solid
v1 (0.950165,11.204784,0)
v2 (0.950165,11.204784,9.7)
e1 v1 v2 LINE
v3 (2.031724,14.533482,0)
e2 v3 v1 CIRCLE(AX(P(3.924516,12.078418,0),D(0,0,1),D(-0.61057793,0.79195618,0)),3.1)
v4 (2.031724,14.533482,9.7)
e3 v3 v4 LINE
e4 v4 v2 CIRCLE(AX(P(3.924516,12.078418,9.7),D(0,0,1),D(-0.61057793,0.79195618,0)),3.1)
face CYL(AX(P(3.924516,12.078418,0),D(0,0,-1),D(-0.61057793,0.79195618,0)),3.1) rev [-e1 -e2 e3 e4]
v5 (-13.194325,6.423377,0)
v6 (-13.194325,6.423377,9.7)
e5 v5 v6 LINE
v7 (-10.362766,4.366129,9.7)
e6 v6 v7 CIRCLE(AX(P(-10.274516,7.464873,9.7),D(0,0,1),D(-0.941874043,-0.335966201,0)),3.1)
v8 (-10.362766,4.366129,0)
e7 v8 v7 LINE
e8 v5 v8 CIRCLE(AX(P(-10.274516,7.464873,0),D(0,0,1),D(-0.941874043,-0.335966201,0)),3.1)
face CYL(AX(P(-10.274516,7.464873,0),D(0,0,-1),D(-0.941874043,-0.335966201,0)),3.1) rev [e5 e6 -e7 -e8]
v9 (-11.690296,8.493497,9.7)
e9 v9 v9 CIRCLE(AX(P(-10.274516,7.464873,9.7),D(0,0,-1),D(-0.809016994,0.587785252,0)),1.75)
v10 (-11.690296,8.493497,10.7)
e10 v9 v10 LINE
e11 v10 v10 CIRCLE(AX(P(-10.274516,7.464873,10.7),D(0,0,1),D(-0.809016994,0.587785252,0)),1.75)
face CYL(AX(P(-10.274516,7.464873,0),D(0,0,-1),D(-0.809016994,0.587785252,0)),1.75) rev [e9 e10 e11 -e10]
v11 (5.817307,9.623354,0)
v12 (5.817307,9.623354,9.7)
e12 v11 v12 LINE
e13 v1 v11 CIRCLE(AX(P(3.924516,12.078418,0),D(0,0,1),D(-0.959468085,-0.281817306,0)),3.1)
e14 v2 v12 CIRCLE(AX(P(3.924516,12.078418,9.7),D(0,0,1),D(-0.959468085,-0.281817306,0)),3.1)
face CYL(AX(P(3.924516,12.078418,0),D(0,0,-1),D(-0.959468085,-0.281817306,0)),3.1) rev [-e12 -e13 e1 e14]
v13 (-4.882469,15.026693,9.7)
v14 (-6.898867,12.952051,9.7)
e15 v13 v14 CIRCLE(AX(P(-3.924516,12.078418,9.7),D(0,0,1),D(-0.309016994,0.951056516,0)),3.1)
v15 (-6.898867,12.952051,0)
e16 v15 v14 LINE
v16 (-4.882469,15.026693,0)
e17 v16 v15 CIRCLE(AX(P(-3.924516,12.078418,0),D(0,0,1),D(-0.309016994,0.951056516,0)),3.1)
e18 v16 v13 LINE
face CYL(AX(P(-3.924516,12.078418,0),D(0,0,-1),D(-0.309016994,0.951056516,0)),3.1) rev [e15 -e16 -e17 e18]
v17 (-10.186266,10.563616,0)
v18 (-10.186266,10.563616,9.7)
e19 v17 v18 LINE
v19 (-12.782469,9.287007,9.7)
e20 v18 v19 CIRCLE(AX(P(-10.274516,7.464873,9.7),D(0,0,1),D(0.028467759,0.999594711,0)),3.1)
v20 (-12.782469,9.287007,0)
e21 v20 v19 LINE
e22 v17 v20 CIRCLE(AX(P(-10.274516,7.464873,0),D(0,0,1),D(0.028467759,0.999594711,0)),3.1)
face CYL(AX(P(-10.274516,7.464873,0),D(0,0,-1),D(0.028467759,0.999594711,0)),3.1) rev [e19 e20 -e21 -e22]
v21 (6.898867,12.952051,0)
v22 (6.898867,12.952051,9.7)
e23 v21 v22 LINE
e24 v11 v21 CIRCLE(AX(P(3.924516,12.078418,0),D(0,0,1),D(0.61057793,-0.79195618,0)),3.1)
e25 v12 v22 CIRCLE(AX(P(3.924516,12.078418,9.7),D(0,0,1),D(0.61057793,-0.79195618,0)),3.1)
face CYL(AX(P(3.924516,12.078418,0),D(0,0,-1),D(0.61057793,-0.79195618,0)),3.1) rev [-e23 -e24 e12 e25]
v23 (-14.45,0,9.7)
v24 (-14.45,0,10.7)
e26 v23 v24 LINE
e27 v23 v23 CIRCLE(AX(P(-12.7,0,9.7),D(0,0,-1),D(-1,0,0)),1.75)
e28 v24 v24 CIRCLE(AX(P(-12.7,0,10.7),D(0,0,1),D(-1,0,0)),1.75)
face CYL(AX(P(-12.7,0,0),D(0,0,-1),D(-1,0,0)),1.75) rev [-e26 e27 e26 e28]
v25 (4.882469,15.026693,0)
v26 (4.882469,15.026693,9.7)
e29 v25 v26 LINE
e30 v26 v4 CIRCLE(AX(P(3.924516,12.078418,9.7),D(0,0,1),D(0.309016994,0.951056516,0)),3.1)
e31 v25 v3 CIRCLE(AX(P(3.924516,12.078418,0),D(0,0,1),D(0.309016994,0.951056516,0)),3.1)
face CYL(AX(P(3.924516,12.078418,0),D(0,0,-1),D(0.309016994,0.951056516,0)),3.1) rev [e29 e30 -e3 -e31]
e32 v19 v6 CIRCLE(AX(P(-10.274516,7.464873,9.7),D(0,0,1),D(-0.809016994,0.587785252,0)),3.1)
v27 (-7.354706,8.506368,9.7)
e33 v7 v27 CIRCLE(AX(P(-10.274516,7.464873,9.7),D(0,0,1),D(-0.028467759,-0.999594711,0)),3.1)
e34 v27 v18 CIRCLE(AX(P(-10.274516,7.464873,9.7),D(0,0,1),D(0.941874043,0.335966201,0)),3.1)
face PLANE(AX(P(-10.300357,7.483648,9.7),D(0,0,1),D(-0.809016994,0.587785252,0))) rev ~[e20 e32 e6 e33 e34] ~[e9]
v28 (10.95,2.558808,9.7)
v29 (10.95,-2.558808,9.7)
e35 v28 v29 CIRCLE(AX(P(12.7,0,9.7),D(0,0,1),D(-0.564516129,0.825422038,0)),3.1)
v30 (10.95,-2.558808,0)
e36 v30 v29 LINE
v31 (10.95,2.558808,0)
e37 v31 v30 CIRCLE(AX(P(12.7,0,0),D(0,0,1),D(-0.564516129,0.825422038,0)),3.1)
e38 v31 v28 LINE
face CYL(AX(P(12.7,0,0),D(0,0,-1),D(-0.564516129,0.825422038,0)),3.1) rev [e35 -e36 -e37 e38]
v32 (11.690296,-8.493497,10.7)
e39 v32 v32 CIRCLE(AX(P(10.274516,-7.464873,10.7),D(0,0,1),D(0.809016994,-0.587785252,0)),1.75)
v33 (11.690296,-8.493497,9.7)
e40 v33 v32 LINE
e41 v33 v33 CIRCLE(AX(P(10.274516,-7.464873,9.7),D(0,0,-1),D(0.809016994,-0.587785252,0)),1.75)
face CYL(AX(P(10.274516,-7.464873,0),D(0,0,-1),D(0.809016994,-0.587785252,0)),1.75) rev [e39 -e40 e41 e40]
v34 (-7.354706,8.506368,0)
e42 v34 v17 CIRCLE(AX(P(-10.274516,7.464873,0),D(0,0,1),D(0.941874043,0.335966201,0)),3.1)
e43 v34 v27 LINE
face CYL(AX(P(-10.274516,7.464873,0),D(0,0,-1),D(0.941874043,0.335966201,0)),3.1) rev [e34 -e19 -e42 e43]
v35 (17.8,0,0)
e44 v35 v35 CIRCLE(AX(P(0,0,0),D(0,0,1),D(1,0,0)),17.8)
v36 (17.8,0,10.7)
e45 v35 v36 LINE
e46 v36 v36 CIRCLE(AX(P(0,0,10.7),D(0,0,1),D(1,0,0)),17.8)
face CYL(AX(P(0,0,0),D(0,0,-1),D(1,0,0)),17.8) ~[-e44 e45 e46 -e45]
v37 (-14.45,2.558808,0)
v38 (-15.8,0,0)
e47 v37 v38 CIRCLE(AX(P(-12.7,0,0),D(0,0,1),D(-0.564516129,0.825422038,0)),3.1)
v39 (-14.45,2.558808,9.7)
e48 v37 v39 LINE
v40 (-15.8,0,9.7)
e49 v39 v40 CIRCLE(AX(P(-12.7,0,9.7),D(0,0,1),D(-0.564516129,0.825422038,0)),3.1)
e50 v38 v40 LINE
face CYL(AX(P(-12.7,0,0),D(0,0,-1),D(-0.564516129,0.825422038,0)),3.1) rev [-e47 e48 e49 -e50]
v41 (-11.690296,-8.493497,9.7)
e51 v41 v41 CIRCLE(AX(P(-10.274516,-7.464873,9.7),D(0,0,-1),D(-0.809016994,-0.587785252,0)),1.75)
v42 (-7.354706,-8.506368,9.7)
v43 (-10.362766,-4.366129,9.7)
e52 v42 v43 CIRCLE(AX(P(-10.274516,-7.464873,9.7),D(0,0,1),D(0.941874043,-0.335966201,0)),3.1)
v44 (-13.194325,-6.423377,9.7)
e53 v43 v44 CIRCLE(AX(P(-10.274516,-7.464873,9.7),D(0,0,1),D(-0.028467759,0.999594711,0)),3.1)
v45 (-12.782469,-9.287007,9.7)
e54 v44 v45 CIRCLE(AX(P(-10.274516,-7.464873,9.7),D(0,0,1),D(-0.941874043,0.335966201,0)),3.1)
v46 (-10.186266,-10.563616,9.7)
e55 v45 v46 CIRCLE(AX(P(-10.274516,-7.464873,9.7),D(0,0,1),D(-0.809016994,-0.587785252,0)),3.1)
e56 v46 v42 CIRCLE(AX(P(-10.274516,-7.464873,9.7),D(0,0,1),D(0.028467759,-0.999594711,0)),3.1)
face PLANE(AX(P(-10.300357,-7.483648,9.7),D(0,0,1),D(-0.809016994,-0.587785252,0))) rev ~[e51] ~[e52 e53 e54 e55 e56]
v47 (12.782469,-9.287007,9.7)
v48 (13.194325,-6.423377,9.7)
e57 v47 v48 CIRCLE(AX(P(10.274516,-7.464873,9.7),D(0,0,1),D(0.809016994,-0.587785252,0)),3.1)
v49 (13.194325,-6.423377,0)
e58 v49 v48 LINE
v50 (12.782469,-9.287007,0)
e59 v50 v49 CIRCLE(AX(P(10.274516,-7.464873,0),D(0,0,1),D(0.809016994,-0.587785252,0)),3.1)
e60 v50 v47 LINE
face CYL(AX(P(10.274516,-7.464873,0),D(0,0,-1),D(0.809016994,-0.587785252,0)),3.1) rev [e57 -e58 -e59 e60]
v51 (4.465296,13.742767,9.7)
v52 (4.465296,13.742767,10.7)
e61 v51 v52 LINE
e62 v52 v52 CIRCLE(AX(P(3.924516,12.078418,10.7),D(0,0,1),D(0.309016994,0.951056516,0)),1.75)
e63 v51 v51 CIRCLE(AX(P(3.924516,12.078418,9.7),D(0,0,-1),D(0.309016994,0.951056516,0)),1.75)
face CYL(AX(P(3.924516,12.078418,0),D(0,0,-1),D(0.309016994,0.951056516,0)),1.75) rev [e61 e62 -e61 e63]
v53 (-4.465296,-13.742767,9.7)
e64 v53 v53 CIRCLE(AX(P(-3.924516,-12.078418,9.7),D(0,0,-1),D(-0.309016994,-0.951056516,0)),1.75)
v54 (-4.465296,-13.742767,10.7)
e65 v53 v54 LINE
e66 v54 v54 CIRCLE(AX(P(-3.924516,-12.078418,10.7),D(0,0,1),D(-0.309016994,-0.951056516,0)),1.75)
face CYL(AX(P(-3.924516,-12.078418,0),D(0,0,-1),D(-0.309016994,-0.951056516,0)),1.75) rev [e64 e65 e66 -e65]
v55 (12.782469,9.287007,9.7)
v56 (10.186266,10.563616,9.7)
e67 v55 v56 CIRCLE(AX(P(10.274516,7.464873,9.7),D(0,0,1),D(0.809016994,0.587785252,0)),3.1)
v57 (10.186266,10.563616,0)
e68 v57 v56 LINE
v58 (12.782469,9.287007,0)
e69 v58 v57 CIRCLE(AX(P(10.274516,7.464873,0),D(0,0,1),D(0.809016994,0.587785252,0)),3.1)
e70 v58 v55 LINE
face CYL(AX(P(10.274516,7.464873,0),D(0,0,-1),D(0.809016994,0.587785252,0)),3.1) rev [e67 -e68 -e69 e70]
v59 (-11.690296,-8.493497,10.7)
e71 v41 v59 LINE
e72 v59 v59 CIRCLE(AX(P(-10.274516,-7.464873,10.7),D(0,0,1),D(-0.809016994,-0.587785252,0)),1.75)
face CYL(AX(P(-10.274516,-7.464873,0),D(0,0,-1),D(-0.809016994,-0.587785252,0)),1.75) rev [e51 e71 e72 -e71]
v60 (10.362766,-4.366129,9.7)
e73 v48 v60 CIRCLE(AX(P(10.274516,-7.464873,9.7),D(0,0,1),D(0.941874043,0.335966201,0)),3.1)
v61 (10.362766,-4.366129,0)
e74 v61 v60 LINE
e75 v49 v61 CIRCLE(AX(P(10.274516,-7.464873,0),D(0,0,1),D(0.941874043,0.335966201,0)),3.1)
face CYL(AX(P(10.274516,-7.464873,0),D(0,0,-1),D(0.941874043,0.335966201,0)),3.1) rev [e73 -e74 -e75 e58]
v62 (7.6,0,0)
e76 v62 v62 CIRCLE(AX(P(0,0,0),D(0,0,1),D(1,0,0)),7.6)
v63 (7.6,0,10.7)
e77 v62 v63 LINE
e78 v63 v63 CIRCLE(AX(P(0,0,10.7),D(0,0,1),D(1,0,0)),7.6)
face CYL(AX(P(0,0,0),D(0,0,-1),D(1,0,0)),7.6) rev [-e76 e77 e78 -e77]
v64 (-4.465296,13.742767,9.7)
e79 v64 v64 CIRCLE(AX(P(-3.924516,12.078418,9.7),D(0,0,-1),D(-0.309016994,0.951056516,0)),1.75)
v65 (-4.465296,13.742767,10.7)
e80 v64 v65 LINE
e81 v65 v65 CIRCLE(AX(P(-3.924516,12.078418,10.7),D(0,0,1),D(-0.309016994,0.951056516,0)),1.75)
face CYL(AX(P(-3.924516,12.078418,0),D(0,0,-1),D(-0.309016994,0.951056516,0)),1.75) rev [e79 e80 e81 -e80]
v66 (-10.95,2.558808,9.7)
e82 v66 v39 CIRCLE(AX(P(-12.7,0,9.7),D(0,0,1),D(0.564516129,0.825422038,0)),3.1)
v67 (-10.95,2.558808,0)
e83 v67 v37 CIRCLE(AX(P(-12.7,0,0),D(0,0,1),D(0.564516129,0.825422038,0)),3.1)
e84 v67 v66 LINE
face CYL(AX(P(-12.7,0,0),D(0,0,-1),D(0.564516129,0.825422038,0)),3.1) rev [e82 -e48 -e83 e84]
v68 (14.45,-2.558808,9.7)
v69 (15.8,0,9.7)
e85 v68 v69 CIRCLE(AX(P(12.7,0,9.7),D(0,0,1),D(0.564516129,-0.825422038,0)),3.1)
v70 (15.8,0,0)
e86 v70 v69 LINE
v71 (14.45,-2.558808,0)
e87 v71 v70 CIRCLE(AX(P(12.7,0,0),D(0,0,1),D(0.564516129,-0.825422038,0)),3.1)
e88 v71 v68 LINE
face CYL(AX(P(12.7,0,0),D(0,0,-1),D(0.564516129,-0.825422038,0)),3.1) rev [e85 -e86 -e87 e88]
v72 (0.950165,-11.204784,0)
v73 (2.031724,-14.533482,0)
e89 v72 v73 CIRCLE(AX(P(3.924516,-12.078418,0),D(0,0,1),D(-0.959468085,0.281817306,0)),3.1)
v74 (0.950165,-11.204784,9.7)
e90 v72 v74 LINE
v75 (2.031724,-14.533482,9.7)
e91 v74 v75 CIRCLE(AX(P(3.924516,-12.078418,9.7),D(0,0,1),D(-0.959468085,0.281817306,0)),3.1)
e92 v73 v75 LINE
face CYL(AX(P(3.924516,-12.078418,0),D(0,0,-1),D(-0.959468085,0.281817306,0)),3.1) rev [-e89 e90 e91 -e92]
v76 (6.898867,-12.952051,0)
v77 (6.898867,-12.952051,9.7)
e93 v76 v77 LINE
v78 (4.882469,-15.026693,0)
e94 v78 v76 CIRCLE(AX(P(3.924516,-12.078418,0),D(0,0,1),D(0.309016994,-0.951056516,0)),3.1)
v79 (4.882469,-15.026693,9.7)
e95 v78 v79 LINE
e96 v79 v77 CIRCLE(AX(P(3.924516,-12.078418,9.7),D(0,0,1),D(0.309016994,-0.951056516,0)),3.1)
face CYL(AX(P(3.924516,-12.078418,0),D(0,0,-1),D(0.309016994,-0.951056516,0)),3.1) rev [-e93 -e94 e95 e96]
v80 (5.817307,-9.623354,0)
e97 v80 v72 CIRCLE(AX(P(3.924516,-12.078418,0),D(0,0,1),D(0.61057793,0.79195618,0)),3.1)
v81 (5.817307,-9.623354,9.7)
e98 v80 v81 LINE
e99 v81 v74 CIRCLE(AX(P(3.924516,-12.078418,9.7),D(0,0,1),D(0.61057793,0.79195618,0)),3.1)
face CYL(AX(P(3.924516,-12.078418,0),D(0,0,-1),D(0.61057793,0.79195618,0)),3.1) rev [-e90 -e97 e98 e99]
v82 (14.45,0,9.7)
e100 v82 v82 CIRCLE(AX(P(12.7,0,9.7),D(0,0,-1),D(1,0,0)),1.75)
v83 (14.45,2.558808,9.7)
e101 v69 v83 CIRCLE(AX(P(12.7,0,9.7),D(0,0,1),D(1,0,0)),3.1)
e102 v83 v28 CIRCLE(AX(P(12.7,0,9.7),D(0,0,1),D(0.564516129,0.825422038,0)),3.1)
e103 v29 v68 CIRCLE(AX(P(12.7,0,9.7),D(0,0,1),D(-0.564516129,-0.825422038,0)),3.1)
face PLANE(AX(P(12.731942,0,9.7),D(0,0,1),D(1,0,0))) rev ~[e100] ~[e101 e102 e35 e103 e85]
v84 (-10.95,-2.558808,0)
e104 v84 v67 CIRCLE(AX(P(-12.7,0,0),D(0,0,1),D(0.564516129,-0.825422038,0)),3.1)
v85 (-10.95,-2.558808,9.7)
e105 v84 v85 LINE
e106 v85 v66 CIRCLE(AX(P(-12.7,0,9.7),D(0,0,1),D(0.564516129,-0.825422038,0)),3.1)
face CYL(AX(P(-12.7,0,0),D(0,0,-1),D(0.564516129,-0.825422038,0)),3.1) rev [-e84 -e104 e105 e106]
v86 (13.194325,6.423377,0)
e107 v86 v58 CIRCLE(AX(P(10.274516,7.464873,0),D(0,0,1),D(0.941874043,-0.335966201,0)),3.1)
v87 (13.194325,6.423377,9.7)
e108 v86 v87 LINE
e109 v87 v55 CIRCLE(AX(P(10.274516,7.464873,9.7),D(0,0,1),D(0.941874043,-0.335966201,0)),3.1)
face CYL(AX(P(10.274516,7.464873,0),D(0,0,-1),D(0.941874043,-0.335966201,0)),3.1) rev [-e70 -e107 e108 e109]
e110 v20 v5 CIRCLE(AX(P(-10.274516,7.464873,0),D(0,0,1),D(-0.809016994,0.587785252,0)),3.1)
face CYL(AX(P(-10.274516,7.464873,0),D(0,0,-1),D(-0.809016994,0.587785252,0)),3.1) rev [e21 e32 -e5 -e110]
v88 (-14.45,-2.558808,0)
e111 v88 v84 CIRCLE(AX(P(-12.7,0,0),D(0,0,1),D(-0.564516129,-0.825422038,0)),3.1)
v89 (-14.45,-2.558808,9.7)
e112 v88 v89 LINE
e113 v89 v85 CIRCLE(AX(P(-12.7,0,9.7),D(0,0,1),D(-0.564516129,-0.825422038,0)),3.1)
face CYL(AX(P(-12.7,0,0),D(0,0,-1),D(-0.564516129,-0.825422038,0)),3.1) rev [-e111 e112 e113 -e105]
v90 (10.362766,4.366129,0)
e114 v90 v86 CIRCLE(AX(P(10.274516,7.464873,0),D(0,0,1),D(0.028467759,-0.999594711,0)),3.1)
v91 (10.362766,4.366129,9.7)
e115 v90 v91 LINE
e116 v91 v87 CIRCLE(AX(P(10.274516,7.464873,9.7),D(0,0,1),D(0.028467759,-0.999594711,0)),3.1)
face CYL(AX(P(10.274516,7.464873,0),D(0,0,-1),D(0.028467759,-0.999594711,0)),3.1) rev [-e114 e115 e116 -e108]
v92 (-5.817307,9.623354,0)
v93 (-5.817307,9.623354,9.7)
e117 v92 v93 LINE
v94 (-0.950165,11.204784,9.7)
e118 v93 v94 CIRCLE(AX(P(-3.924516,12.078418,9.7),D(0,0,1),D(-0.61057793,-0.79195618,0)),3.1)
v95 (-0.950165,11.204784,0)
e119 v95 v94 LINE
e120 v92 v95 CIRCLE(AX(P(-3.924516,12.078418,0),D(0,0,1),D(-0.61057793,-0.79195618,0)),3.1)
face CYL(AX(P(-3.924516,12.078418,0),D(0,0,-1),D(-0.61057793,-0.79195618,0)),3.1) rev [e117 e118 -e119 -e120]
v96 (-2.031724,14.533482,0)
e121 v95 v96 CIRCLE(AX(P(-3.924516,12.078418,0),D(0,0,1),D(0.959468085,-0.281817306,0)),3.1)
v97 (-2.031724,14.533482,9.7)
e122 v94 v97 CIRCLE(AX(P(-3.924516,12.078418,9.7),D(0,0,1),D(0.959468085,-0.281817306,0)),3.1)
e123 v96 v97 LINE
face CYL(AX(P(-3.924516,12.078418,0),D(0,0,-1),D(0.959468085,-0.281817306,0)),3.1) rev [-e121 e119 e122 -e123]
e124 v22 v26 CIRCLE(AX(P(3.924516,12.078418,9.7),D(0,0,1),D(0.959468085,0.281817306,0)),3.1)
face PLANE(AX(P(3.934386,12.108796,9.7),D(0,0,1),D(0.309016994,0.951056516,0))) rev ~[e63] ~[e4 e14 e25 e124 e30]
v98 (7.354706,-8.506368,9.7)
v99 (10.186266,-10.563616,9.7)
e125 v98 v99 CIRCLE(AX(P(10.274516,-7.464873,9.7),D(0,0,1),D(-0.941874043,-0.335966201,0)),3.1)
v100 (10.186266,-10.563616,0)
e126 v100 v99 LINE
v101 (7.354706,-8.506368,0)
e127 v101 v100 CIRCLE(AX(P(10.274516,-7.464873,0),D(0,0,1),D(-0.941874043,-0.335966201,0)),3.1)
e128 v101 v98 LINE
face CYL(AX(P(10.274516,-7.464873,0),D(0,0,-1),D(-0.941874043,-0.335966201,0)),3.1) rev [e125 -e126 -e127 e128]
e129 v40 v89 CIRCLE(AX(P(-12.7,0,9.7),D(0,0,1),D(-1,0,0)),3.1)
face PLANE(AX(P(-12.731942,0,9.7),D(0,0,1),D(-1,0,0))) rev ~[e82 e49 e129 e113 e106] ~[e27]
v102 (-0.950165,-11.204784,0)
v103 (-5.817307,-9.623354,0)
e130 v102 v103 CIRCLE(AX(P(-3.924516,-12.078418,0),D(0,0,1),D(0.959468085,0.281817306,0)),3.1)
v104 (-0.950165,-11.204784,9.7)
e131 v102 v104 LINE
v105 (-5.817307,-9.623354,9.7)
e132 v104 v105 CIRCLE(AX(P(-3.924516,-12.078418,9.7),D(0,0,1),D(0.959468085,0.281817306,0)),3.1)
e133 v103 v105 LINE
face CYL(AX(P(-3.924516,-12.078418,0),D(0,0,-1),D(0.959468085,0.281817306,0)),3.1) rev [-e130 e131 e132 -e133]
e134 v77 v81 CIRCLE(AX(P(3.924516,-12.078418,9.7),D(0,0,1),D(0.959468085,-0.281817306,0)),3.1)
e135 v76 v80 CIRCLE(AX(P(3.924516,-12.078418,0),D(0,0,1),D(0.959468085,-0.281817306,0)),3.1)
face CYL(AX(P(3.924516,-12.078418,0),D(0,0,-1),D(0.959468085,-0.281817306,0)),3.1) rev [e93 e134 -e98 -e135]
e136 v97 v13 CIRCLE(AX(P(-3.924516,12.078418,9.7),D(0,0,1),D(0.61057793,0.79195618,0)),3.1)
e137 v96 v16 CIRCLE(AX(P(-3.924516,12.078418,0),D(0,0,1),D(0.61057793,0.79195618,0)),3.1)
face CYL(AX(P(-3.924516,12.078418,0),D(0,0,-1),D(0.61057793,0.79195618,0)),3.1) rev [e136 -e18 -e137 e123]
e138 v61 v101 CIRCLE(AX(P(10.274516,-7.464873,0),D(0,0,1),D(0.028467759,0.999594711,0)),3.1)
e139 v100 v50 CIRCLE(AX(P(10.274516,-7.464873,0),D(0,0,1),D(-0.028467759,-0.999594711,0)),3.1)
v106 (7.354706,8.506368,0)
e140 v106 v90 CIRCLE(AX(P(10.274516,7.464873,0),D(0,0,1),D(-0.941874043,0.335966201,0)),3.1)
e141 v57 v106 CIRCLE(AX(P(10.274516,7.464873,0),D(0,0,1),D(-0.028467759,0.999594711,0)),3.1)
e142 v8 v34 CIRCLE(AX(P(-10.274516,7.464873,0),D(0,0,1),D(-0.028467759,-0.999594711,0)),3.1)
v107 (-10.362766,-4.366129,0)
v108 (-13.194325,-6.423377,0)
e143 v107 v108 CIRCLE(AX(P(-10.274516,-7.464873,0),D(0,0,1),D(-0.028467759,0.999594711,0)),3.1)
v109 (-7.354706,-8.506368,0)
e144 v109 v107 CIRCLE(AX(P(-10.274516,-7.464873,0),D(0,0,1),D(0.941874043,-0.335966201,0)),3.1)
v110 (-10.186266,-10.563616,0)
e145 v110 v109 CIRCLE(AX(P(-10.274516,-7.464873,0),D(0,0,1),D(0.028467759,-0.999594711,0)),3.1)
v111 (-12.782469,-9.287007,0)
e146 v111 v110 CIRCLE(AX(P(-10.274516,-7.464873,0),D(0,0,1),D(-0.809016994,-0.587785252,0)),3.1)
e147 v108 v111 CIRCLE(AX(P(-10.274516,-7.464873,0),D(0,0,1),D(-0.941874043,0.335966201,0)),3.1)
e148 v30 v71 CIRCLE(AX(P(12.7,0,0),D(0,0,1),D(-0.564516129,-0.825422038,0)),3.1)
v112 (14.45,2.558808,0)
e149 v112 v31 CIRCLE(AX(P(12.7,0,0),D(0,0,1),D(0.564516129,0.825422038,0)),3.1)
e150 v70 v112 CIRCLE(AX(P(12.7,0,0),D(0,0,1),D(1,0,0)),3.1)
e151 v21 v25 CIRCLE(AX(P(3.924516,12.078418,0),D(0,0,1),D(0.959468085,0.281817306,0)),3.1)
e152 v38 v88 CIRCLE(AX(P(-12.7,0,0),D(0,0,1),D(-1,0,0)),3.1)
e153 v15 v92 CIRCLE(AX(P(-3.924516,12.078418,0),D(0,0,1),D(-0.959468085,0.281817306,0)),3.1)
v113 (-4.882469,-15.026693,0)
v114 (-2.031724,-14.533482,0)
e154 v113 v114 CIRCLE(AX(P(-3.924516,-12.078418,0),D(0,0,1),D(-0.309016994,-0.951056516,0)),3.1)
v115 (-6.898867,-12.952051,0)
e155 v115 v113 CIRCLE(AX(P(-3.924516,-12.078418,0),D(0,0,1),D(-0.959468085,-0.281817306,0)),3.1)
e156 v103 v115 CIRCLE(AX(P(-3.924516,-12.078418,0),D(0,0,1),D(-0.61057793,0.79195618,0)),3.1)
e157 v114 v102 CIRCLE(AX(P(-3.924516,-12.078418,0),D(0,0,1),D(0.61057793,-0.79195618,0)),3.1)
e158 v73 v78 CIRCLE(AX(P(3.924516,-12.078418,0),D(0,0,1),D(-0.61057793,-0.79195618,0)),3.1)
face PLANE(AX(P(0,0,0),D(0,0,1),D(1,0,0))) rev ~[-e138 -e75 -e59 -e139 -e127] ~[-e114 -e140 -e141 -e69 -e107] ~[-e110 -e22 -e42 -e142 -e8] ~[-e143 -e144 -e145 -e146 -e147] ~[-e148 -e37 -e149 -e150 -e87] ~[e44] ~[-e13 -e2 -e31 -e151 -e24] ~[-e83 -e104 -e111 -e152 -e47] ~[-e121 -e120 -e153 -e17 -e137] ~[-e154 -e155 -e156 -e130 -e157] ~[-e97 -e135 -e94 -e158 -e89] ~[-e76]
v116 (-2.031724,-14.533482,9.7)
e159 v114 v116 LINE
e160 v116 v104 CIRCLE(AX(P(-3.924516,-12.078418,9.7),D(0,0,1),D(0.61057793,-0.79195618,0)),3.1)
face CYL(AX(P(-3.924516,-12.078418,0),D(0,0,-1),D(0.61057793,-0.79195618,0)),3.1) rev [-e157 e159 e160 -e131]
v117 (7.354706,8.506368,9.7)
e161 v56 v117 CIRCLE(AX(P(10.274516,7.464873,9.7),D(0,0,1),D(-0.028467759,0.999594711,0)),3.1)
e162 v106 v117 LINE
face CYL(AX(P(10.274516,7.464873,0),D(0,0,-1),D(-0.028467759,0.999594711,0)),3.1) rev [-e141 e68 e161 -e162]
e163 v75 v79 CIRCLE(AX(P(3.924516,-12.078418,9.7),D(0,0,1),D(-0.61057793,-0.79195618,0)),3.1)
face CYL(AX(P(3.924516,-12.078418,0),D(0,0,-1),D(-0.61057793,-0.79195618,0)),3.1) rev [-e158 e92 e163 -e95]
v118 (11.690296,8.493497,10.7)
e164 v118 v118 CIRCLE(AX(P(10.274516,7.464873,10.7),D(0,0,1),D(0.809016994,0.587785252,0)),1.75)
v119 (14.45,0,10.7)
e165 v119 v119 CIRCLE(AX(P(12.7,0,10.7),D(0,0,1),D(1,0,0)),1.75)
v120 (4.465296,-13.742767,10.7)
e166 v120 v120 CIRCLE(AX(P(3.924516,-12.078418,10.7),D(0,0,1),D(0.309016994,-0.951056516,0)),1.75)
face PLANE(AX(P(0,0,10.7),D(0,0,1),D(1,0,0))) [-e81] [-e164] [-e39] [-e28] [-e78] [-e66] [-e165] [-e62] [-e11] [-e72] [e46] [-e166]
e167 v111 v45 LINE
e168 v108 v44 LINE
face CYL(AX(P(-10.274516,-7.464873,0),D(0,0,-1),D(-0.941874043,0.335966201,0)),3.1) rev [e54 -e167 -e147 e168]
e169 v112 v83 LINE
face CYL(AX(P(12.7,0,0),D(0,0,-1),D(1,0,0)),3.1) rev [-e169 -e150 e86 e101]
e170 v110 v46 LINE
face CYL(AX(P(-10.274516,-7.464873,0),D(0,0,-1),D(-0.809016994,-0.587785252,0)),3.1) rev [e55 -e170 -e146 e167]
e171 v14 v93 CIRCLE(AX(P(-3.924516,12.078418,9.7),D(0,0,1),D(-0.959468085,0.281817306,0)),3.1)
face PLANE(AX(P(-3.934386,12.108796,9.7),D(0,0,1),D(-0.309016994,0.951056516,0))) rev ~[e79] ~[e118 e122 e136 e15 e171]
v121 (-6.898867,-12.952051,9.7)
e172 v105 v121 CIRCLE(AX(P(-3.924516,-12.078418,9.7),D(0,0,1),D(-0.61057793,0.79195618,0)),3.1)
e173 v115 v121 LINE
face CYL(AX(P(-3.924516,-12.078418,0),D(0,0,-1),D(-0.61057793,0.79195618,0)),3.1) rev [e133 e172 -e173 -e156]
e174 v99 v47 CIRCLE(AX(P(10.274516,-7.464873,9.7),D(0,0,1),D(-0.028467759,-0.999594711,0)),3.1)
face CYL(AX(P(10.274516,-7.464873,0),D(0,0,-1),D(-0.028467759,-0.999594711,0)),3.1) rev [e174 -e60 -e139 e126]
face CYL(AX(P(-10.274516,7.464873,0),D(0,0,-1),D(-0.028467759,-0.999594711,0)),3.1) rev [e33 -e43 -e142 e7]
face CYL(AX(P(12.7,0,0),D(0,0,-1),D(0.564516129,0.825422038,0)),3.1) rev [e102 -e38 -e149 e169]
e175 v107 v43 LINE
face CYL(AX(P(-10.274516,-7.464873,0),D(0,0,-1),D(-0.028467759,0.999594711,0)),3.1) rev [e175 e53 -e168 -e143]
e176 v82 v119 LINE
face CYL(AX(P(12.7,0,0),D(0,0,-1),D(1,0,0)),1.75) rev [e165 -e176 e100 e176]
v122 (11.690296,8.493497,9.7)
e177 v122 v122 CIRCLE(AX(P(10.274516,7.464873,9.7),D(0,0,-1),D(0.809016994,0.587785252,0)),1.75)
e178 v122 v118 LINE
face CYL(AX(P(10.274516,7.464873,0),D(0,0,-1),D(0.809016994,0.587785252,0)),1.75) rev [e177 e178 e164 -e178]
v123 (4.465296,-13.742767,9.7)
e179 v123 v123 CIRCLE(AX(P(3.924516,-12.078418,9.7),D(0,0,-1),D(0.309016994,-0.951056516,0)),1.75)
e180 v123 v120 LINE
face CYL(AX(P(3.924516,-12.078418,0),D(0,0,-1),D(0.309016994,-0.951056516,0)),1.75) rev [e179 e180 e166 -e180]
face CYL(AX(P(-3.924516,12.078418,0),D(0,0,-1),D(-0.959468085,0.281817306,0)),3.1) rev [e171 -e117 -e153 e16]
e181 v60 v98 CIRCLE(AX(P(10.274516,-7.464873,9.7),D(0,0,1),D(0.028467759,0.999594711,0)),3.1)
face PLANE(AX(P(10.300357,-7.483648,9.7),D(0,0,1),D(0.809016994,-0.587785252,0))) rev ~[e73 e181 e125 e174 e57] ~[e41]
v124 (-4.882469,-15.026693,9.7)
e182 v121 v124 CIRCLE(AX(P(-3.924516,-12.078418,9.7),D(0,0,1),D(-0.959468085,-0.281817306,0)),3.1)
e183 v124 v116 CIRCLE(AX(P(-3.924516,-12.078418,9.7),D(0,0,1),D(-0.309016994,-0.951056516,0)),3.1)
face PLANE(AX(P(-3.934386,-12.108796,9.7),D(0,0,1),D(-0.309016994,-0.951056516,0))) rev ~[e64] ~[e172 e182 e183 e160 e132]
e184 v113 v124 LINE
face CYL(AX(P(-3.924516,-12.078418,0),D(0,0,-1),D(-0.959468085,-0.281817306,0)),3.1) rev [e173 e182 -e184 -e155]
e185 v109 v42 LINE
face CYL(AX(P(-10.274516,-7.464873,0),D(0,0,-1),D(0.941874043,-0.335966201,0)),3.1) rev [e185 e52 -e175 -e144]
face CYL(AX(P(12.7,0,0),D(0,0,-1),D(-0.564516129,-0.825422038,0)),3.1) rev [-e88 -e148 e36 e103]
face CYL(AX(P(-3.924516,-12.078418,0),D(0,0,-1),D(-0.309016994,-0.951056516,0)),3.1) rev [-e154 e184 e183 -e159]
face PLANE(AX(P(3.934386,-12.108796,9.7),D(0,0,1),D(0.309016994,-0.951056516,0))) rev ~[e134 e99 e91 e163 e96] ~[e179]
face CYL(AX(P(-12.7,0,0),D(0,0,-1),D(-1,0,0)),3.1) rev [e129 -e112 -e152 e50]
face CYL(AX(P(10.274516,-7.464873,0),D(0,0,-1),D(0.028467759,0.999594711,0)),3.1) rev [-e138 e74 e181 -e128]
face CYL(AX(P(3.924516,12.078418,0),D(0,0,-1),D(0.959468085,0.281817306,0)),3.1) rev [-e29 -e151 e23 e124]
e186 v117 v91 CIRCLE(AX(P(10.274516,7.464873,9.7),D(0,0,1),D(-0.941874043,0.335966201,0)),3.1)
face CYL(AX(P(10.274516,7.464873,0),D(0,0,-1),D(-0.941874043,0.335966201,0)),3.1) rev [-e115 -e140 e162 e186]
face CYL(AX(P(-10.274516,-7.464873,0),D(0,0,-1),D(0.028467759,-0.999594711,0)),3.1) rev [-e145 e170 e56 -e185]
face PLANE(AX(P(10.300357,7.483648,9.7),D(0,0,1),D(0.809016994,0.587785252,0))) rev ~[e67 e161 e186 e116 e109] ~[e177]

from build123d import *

# Parameters (mm, degrees)
F0_R            = 17.8
F0_R_2          = 7.6
F0_R_3          = 1.75
F1_DEPTH        = 10.7
F2_DEPTH        = 9.7
F2_COPIES_COUNT = 10
F3_DEPTH        = 10.7
F3_COPIES_COUNT = 10


# Not quite as in the source:
# - a pattern or mirror of a feature is missing from the dataset's text; its kind, count and spacing are read off the source's solid


with BuildPart() as f1:
    # F0 (on Top) → F1 (new body)
    with BuildSketch(Plane.XY):
        Circle(F0_R)
        Circle(F0_R_2, mode=Mode.SUBTRACT)
        with BuildLine():
            ThreePointArc((14.45, 2.5588083164), (15.4418059742, 1.4465476141), (15.8, 0))
            ThreePointArc((15.8, 0), (15.4418059742, -1.4465476141), (14.45, -2.5588083164))
            Line((14.45, -2.5588083164), (14.45, -3.5))
            Line((14.45, -3.5), (10.95, -3.5))
            Line((10.95, -3.5), (10.95, -2.5588083164))
            ThreePointArc((10.95, -2.5588083164), (9.6, 0), (10.95, 2.5588083164))
            Line((10.95, 2.5588083164), (10.95, 3.5))
            Line((10.95, 3.5), (14.45, 3.5))
            Line((14.45, 3.5), (14.45, 2.5588083164))
        make_face(mode=Mode.SUBTRACT)
        with BuildLine():
            ThreePointArc((14.45, -2.5588083164), (15.4418059742, -1.4465476141), (15.8, 0))
            ThreePointArc((15.8, 0), (15.4418059742, 1.4465476141), (14.45, 2.5588083164))
            ThreePointArc((14.45, 2.5588083164), (12.7, 3.1), (10.95, 2.5588083164))
            ThreePointArc((10.95, 2.5588083164), (9.6, 0), (10.95, -2.5588083164))
            ThreePointArc((10.95, -2.5588083164), (12.7, -3.1), (14.45, -2.5588083164))
        make_face()
        with Locations((12.7, 0)):
            Circle(F0_R_3, mode=Mode.SUBTRACT)
        with Locations((12.7, 0)):
            Circle(F0_R_3)
        with BuildLine():
            Line((14.45, -3.5), (14.45, -2.5588083164))
            ThreePointArc((14.45, -2.5588083164), (12.7, -3.1), (10.95, -2.5588083164))
            Line((10.95, -2.5588083164), (10.95, -3.5))
            Line((10.95, -3.5), (14.45, -3.5))
        make_face()
        with BuildLine():
            ThreePointArc((10.95, 2.5588083164), (12.7, 3.1), (14.45, 2.5588083164))
            Line((14.45, 2.5588083164), (14.45, 3.5))
            Line((14.45, 3.5), (10.95, 3.5))
            Line((10.95, 3.5), (10.95, 2.5588083164))
        make_face()
    extrude(amount=F1_DEPTH)

    # F0 (on Top) → F2 (cut)
    with BuildSketch(Plane.XY):
        with BuildLine():
            ThreePointArc((14.45, -2.5588083164), (15.4418059742, -1.4465476141), (15.8, 0))
            ThreePointArc((15.8, 0), (15.4418059742, 1.4465476141), (14.45, 2.5588083164))
            ThreePointArc((14.45, 2.5588083164), (12.7, 3.1), (10.95, 2.5588083164))
            ThreePointArc((10.95, 2.5588083164), (9.6, 0), (10.95, -2.5588083164))
            ThreePointArc((10.95, -2.5588083164), (12.7, -3.1), (14.45, -2.5588083164))
        make_face()
        with Locations((12.7, 0)):
            Circle(F0_R_3, mode=Mode.SUBTRACT)
        with Locations((12.7, 0)):
            Circle(F0_R_3)
    f2 = extrude(amount=F2_DEPTH, mode=Mode.SUBTRACT)

    # F2_copies: F2 ×10 about axis
    f2_copies_axis = Axis((0, 0, 0), (0, 0, 1))
    for i in range(1, F2_COPIES_COUNT):
        add(f2.rotate(f2_copies_axis, i * 360 / F2_COPIES_COUNT), mode=Mode.SUBTRACT)

    # F0 (on Top) → F3 (cut, through all)
    with BuildSketch(Plane.XY):
        with Locations((12.7, 0)):
            Circle(F0_R_3)
    f3 = extrude(amount=F3_DEPTH, mode=Mode.SUBTRACT)

    # F3_copies: F3 ×10 about axis
    f3_copies_axis = Axis((0, 0, 0), (0, 0, 1))
    for i in range(1, F3_COPIES_COUNT):
        add(f3.rotate(f3_copies_axis, i * 360 / F3_COPIES_COUNT), mode=Mode.SUBTRACT)


solid = f1.part
